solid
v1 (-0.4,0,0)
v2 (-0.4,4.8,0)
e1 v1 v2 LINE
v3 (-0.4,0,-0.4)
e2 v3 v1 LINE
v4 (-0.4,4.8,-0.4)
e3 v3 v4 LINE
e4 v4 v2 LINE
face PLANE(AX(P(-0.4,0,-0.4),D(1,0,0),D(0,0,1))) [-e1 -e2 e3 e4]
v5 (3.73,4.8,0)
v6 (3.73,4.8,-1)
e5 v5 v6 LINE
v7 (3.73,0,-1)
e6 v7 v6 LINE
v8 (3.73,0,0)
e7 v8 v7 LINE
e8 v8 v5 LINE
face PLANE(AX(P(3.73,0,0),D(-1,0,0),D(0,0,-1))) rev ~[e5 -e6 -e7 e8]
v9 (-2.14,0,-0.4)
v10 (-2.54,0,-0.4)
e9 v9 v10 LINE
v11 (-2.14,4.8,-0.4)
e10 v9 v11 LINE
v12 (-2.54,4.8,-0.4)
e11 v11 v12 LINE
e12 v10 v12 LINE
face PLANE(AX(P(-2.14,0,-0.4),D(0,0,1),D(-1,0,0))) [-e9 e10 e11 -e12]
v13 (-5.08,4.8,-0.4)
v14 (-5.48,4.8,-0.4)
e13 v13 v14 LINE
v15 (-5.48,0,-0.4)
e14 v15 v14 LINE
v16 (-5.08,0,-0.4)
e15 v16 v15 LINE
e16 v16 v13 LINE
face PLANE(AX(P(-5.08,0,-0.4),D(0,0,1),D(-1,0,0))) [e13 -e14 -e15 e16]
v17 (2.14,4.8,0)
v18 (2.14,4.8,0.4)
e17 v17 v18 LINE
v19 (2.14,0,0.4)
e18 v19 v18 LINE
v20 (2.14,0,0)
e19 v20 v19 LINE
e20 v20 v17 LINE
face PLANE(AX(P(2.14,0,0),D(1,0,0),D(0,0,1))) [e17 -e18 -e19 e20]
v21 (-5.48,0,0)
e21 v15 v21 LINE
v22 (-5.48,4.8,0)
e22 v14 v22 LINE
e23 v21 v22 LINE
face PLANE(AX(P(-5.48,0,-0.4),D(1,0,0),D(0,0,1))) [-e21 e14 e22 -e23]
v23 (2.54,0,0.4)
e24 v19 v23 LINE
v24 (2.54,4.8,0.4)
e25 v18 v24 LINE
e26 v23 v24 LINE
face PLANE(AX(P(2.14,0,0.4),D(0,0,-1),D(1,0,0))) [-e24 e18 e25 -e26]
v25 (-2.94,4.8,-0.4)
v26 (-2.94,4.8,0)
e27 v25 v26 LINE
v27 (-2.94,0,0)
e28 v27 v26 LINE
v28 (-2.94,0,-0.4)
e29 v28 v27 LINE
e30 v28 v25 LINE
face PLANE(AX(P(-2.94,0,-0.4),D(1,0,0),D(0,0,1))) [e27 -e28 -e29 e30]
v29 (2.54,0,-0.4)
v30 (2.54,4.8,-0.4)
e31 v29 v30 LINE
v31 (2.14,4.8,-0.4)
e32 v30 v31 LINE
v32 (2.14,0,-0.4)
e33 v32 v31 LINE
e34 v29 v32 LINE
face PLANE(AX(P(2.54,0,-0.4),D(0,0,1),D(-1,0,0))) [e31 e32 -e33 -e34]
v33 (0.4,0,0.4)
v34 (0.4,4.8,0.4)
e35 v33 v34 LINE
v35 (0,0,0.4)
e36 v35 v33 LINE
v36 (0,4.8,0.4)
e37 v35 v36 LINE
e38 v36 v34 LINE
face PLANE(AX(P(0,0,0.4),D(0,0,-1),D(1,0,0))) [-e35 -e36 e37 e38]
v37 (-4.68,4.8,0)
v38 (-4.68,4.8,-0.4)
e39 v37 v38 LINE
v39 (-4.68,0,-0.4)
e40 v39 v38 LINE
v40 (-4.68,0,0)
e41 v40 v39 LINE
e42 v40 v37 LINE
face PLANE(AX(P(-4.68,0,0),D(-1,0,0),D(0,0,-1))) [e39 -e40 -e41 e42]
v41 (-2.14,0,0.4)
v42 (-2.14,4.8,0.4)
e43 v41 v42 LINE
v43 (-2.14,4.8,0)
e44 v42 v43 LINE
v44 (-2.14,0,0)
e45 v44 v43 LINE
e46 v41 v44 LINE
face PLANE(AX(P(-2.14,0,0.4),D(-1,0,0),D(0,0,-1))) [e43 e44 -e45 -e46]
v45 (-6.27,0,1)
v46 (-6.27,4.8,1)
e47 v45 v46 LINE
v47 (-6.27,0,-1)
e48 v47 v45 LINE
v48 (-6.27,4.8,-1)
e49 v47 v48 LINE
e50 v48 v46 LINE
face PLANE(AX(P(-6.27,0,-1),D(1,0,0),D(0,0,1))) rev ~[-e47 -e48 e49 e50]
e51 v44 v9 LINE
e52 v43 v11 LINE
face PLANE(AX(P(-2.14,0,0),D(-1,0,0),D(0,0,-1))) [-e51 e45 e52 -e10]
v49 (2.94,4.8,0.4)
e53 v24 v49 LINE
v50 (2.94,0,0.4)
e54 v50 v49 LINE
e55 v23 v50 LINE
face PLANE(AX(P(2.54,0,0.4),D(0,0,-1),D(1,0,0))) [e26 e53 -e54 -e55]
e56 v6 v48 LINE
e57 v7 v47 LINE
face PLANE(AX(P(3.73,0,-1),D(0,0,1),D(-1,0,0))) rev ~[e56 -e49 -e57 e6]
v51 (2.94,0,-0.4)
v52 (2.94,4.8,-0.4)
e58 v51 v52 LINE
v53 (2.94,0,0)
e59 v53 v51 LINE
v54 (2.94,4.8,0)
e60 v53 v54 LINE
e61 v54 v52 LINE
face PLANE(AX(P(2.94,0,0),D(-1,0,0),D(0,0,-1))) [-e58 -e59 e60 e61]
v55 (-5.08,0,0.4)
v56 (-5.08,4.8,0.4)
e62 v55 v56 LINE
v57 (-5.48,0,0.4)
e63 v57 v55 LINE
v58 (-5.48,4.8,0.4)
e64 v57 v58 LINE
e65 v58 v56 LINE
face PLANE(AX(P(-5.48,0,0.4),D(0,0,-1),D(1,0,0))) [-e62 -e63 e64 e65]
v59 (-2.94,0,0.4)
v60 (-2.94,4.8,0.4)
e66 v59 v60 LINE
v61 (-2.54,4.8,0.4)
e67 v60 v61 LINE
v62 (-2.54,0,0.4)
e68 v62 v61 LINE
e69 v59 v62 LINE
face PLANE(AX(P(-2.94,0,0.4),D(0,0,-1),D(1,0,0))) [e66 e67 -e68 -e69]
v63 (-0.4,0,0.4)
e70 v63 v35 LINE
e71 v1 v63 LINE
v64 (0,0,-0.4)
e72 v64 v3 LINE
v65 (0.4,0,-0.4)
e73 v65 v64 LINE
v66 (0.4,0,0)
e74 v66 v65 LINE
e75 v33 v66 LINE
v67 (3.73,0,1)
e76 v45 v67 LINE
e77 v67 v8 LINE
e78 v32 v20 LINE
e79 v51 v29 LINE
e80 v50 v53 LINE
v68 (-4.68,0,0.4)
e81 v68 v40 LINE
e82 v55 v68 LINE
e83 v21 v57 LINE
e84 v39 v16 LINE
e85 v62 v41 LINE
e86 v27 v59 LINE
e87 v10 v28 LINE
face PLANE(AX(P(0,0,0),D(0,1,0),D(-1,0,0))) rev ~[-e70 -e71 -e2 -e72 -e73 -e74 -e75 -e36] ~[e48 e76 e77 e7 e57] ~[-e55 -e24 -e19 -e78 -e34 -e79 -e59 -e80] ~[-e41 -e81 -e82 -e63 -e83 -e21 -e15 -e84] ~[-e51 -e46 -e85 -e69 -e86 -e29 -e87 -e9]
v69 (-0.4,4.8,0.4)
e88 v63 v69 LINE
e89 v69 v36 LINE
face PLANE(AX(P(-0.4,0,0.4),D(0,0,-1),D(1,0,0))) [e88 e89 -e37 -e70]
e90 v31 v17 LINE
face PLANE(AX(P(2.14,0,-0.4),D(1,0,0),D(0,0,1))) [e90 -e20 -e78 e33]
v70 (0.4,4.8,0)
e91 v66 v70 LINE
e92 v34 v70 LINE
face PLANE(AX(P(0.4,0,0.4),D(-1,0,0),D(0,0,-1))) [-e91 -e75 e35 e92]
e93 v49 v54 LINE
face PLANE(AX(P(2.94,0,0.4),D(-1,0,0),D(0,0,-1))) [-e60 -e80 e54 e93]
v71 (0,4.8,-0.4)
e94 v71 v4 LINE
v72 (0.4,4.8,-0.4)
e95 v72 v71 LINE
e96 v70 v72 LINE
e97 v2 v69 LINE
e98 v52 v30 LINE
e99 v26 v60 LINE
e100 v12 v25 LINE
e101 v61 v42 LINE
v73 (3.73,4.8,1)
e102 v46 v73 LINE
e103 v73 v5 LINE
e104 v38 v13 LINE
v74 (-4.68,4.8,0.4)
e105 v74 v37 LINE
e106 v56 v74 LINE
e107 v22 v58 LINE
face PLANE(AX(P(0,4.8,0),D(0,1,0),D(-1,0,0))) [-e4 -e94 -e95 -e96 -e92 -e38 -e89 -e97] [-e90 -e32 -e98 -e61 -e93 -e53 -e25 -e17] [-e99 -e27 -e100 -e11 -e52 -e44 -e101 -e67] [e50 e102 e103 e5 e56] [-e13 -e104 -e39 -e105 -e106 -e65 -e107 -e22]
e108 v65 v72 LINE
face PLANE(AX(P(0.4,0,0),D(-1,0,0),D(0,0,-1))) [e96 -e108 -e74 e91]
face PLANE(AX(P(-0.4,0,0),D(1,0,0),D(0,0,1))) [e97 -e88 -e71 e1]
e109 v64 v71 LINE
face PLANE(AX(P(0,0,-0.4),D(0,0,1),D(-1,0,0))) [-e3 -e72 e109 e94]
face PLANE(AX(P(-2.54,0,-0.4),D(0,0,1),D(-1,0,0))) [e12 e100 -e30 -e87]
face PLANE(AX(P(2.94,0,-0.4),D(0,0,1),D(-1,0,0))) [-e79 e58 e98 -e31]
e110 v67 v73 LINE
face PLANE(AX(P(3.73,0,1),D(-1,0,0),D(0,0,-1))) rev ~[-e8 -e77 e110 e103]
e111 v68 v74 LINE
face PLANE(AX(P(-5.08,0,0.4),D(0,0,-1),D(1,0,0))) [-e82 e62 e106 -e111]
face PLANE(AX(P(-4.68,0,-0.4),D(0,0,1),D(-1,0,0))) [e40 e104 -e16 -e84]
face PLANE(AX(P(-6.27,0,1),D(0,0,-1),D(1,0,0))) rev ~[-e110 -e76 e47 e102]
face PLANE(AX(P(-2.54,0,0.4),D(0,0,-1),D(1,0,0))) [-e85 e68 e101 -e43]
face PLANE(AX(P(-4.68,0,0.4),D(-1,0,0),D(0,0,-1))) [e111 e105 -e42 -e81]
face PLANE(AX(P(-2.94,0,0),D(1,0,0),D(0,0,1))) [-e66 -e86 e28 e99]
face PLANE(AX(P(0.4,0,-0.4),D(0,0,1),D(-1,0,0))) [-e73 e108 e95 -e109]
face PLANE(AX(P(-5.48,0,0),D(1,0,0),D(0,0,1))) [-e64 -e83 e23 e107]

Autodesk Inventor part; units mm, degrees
ref_plane "YZ Plane" through (0, 0, 0) normal (1, 0, 0) x (0, 1, 0)
ref_plane "XZ Plane" through (0, 0, 0) normal (0, 1, 0) x (-1, 0, 0)
ref_plane "XY Plane" through (0, 0, 0) normal (0, 0, 1) x (1, 0, 0)
sketch "スケッチ1" plane through (0, 0, 0) normal (0, 1, 0) x (-1, 0, 0)
  line L0 (0, 0) -> (5.08, 0)
  line L1 (5.08, 0) -> (2.54, 0)
  line L2 (2.54, 0) -> (0, 0)
  line L3 (0, 0) -> (-2.54, 0)
  line L4 (-2.54, 0) -> (-5.08, 0)
  circle A0 centre (-2.54, 0) radius 0.4
  circle A1 centre (0, 0) radius 0.4
  circle A2 centre (2.54, 0) radius 0.4
  circle A3 centre (5.08, 0) radius 0.4
  line L5 (0, 0) -> (1.27, 0)
  line L6 (-3.73, -1) -> (6.27, -1)
  line L7 (6.27, -1) -> (6.27, 1)
  line L8 (6.27, 1) -> (-3.73, 1)
  line L9 (-3.73, 1) -> (-3.73, -1)
  line L10 (-3.73, -1) -> (6.27, 1) construction
  line L11 (6.27, -1) -> (-3.73, 1) construction
  line L12 (4.68, -0.4) -> (5.48, -0.4)
  line L13 (5.48, -0.4) -> (5.48, 0.4)
  line L14 (5.48, 0.4) -> (4.68, 0.4)
  line L15 (4.68, 0.4) -> (4.68, -0.4)
  line L16 (4.68, -0.4) -> (5.48, 0.4) construction
  line L17 (5.48, -0.4) -> (4.68, 0.4) construction
  line L18 (2.14, -0.4) -> (2.94, -0.4)
  line L19 (2.94, -0.4) -> (2.94, 0.4)
  line L20 (2.94, 0.4) -> (2.14, 0.4)
  line L21 (2.14, 0.4) -> (2.14, -0.4)
  line L22 (2.14, -0.4) -> (2.94, 0.4) construction
  line L23 (2.94, -0.4) -> (2.14, 0.4) construction
  line L24 (-0.4, -0.4) -> (0.4, -0.4)
  line L25 (0.4, -0.4) -> (0.4, 0.4)
  line L26 (0.4, 0.4) -> (-0.4, 0.4)
  line L27 (-0.4, 0.4) -> (-0.4, -0.4)
  line L28 (-0.4, -0.4) -> (0.4, 0.4) construction
  line L29 (0.4, -0.4) -> (-0.4, 0.4) construction
  line L30 (-2.94, -0.4) -> (-2.14, -0.4)
  line L31 (-2.14, -0.4) -> (-2.14, 0.4)
  line L32 (-2.14, 0.4) -> (-2.94, 0.4)
  line L33 (-2.94, 0.4) -> (-2.94, -0.4)
  line L34 (-2.94, -0.4) -> (-2.14, 0.4) construction
  line L35 (-2.14, -0.4) -> (-2.94, 0.4) construction
  dimension "d0" = 5.08
  dimension "d1" = 2.54
  dimension "d2" = 2.54
  dimension "d3" = 2.54
  dimension "d4" = 0.8
  dimension "d5" = 0.8
  dimension "d6" = 0.8
  dimension "d7" = 0.8
  dimension "d8" = 1.27
  dimension "d9" = 10
  dimension "d10" = 2
extrude "押し出し1" add sketch "スケッチ1" along normal blind 4.8
properties part number "ikafly8_2.54"
